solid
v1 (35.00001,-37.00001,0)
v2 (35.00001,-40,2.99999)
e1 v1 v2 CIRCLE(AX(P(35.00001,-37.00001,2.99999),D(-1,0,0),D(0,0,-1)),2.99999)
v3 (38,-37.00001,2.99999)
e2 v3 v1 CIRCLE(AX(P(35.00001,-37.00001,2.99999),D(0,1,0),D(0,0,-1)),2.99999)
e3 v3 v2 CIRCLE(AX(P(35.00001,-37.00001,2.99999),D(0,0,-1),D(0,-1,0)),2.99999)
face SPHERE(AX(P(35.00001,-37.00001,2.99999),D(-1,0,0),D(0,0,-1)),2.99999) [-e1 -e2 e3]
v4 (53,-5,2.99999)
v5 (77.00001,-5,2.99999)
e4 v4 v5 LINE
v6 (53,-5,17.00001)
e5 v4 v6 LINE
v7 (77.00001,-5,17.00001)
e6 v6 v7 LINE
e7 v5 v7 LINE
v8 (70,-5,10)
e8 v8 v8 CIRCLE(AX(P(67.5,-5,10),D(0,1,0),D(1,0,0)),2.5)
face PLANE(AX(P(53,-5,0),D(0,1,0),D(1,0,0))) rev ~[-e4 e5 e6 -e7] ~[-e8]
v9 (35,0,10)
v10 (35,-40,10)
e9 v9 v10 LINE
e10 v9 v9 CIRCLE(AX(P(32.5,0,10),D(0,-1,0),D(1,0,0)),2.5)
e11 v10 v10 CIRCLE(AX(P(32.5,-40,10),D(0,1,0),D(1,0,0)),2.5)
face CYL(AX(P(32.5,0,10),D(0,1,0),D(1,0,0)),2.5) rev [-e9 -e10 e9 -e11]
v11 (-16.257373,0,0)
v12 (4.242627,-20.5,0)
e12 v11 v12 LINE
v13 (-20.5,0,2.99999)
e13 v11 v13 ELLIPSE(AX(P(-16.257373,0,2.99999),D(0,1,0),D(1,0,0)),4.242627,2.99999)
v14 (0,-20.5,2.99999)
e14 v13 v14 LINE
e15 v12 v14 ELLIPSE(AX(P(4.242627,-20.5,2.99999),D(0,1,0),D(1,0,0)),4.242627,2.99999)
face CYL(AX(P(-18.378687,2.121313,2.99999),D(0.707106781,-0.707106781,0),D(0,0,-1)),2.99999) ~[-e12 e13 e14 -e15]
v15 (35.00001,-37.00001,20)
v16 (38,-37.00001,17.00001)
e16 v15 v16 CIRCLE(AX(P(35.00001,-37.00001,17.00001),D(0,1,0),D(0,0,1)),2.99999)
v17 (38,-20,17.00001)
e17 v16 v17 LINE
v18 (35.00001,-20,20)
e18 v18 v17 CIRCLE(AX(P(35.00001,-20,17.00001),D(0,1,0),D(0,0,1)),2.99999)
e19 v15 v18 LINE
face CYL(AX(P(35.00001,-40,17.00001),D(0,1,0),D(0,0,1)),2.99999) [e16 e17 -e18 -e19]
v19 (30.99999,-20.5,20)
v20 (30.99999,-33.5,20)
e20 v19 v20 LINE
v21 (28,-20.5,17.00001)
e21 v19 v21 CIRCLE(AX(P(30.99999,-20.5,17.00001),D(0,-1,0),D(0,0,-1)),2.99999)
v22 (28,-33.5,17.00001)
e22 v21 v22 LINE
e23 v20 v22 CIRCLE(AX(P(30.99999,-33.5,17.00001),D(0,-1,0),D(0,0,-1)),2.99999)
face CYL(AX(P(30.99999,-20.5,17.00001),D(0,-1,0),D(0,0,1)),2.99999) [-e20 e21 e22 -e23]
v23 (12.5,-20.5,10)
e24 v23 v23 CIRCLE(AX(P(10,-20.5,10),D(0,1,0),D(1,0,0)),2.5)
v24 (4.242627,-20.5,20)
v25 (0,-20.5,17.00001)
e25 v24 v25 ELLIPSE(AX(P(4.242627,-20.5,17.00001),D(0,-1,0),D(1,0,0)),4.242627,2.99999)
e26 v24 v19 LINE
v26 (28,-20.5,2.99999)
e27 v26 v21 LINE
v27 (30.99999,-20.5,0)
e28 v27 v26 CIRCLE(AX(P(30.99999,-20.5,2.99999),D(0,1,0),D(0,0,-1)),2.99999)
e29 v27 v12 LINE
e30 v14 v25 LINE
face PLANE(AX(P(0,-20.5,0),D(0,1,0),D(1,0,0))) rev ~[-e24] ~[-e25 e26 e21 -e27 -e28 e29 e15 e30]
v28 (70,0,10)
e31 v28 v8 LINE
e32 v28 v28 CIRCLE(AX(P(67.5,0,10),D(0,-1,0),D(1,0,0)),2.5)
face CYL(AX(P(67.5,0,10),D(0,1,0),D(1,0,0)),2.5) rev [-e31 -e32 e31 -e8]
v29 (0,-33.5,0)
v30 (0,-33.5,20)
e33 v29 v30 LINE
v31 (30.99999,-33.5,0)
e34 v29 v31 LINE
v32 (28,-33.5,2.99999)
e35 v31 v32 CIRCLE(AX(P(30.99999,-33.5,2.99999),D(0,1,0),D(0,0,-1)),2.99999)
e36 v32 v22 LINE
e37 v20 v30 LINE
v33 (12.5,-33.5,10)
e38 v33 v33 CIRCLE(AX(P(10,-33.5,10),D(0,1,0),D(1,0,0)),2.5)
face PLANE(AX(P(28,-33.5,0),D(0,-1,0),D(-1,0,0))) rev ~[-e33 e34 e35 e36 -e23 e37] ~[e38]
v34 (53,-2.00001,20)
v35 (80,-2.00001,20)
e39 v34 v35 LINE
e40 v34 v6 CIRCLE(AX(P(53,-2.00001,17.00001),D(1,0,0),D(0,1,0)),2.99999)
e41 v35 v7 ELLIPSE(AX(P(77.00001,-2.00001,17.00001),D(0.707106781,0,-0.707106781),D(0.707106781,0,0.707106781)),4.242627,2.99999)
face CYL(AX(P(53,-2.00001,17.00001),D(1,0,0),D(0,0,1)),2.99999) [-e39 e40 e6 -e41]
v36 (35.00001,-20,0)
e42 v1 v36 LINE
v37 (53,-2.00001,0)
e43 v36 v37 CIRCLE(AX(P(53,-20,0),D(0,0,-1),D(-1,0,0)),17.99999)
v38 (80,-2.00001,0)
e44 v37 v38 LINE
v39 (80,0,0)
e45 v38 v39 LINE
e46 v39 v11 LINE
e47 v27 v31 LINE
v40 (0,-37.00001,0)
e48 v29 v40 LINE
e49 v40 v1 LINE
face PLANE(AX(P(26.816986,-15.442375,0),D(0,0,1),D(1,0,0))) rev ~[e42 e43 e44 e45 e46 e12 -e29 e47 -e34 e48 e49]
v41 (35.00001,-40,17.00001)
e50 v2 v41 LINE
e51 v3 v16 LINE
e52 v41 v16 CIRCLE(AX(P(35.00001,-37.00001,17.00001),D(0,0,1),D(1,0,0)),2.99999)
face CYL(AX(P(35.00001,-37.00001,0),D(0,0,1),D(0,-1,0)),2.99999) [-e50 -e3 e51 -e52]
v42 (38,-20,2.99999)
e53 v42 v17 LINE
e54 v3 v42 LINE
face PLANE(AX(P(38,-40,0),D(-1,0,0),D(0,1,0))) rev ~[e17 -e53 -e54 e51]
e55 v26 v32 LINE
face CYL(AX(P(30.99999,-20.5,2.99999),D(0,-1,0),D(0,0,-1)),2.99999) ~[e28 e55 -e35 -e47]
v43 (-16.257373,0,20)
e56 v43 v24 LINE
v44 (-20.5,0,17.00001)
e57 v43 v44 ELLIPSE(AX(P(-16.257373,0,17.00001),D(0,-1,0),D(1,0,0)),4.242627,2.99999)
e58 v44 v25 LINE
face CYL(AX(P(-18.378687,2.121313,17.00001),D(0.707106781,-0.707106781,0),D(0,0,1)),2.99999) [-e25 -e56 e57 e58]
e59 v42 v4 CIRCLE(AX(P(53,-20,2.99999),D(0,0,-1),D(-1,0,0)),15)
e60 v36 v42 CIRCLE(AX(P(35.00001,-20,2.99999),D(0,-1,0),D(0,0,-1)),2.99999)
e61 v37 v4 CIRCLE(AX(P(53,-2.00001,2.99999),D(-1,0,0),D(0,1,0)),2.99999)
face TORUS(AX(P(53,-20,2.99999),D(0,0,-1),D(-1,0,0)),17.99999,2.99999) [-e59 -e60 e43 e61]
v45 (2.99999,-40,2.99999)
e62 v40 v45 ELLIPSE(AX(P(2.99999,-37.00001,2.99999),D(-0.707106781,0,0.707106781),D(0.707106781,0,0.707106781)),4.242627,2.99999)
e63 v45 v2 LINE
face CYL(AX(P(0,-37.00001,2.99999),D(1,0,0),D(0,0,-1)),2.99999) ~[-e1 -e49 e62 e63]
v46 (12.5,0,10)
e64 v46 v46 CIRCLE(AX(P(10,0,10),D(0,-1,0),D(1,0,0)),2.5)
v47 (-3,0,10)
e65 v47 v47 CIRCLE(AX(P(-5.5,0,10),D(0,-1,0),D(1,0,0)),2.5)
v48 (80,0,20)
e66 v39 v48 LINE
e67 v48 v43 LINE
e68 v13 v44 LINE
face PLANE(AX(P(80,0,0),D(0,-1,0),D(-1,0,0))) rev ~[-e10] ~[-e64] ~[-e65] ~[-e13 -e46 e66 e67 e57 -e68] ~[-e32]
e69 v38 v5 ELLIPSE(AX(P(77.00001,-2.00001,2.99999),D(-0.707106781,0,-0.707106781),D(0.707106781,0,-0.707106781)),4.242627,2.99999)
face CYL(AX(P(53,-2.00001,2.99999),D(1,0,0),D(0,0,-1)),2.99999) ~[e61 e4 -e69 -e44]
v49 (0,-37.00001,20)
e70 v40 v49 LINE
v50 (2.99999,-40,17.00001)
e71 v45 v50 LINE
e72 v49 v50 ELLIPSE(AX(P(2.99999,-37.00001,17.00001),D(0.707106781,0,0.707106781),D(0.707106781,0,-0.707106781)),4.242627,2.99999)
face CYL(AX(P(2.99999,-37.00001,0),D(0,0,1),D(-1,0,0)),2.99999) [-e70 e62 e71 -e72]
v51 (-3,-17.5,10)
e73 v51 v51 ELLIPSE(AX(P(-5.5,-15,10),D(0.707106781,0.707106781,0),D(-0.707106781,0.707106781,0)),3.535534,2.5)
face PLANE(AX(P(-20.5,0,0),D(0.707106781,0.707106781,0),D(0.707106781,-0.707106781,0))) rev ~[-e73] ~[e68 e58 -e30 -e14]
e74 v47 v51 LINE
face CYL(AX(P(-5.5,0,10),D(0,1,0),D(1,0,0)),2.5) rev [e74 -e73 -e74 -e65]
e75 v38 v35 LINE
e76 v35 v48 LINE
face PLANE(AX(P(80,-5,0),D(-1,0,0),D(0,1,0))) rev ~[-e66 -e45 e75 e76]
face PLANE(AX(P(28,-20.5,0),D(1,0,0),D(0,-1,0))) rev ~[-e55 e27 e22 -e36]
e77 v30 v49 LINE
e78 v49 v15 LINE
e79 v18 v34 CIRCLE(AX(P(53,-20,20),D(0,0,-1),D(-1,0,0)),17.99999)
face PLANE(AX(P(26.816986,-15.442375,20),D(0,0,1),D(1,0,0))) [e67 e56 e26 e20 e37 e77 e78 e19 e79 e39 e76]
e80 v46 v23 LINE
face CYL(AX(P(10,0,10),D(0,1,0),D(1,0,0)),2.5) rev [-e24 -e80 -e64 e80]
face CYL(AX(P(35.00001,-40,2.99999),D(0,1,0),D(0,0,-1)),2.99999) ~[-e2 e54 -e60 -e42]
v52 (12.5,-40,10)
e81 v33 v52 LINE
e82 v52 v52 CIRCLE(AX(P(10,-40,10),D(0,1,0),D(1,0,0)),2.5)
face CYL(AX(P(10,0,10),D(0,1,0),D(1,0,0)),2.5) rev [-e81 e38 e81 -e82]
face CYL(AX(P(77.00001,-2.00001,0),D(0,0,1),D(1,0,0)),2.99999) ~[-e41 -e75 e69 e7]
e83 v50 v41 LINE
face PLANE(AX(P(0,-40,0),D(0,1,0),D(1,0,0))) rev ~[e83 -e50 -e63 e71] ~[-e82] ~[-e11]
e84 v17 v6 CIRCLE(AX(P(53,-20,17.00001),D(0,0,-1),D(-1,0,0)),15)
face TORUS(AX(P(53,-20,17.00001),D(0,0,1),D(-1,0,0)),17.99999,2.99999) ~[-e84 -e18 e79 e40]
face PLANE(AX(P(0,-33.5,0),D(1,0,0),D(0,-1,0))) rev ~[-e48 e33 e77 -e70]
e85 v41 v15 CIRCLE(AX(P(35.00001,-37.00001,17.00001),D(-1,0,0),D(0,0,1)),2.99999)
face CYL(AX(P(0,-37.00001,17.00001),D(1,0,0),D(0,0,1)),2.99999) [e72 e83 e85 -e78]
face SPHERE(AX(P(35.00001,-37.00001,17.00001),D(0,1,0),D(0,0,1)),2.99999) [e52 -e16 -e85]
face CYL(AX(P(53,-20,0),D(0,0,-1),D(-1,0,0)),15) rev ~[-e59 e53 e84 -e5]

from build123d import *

# Parameters (mm, degrees)
F1_DEPTH = 20
F2_R     = 2.5
F3_DEPTH = 50
F4_R     = 2.99999


# Not quite as in the source:
# - a fillet or chamfer is up to 0.001 mm smaller than in the source, because OpenCascade refuses the exact size


with BuildPart() as f1:
    # F0 (on Top) → F1 (new body)
    with BuildSketch(Plane.XY):
        with BuildLine():
            Line((80, 0), (-20.5, 0))
            Line((-20.5, 0), (0, -20.5))
            Line((0, -20.5), (28, -20.5))
            Line((28, -20.5), (28, -33.5))
            Line((28, -33.5), (0, -33.5))
            Line((0, -33.5), (0, -40))
            Line((0, -40), (38, -40))
            Line((38, -40), (38, -20))
            ThreePointArc((38, -20), (42.3933982822, -9.3933982822), (53, -5))
            Line((53, -5), (80, -5))
            Line((80, -5), (80, 0))
        make_face()
    extrude(amount=F1_DEPTH)

    # F2 (on Front) → F3 (cut)
    with BuildSketch(Plane.XZ):
        with Locations((10, 10)):
            Circle(F2_R)
        with Locations((-5.5, 10)):
            Circle(F2_R)
        with Locations((32.5, 10)):
            Circle(F2_R)
        with Locations((67.5, 10)):
            Circle(F2_R)
    extrude(amount=F3_DEPTH, mode=Mode.SUBTRACT)

    # F4 (radius 3 in the source; OpenCascade refuses exactly that, so slightly less here)
    f4_edges = [f1.edges().sort_by_distance(p)[0] for p in [
        (66.5, -5, 20),
        (19, -40, 20),
        (0, -40, 10),
        (19, -40, 0),
        (66.5, -5, 0),
        (-10.25, -10.25, 20),
        (-10.25, -10.25, 0),
        (80, -5, 10),
        (38, -40, 10),
        (28, -27, 20),
        (28, -27, 0),
    ]]
    fillet(f4_edges, radius=F4_R)


solid = f1.part
